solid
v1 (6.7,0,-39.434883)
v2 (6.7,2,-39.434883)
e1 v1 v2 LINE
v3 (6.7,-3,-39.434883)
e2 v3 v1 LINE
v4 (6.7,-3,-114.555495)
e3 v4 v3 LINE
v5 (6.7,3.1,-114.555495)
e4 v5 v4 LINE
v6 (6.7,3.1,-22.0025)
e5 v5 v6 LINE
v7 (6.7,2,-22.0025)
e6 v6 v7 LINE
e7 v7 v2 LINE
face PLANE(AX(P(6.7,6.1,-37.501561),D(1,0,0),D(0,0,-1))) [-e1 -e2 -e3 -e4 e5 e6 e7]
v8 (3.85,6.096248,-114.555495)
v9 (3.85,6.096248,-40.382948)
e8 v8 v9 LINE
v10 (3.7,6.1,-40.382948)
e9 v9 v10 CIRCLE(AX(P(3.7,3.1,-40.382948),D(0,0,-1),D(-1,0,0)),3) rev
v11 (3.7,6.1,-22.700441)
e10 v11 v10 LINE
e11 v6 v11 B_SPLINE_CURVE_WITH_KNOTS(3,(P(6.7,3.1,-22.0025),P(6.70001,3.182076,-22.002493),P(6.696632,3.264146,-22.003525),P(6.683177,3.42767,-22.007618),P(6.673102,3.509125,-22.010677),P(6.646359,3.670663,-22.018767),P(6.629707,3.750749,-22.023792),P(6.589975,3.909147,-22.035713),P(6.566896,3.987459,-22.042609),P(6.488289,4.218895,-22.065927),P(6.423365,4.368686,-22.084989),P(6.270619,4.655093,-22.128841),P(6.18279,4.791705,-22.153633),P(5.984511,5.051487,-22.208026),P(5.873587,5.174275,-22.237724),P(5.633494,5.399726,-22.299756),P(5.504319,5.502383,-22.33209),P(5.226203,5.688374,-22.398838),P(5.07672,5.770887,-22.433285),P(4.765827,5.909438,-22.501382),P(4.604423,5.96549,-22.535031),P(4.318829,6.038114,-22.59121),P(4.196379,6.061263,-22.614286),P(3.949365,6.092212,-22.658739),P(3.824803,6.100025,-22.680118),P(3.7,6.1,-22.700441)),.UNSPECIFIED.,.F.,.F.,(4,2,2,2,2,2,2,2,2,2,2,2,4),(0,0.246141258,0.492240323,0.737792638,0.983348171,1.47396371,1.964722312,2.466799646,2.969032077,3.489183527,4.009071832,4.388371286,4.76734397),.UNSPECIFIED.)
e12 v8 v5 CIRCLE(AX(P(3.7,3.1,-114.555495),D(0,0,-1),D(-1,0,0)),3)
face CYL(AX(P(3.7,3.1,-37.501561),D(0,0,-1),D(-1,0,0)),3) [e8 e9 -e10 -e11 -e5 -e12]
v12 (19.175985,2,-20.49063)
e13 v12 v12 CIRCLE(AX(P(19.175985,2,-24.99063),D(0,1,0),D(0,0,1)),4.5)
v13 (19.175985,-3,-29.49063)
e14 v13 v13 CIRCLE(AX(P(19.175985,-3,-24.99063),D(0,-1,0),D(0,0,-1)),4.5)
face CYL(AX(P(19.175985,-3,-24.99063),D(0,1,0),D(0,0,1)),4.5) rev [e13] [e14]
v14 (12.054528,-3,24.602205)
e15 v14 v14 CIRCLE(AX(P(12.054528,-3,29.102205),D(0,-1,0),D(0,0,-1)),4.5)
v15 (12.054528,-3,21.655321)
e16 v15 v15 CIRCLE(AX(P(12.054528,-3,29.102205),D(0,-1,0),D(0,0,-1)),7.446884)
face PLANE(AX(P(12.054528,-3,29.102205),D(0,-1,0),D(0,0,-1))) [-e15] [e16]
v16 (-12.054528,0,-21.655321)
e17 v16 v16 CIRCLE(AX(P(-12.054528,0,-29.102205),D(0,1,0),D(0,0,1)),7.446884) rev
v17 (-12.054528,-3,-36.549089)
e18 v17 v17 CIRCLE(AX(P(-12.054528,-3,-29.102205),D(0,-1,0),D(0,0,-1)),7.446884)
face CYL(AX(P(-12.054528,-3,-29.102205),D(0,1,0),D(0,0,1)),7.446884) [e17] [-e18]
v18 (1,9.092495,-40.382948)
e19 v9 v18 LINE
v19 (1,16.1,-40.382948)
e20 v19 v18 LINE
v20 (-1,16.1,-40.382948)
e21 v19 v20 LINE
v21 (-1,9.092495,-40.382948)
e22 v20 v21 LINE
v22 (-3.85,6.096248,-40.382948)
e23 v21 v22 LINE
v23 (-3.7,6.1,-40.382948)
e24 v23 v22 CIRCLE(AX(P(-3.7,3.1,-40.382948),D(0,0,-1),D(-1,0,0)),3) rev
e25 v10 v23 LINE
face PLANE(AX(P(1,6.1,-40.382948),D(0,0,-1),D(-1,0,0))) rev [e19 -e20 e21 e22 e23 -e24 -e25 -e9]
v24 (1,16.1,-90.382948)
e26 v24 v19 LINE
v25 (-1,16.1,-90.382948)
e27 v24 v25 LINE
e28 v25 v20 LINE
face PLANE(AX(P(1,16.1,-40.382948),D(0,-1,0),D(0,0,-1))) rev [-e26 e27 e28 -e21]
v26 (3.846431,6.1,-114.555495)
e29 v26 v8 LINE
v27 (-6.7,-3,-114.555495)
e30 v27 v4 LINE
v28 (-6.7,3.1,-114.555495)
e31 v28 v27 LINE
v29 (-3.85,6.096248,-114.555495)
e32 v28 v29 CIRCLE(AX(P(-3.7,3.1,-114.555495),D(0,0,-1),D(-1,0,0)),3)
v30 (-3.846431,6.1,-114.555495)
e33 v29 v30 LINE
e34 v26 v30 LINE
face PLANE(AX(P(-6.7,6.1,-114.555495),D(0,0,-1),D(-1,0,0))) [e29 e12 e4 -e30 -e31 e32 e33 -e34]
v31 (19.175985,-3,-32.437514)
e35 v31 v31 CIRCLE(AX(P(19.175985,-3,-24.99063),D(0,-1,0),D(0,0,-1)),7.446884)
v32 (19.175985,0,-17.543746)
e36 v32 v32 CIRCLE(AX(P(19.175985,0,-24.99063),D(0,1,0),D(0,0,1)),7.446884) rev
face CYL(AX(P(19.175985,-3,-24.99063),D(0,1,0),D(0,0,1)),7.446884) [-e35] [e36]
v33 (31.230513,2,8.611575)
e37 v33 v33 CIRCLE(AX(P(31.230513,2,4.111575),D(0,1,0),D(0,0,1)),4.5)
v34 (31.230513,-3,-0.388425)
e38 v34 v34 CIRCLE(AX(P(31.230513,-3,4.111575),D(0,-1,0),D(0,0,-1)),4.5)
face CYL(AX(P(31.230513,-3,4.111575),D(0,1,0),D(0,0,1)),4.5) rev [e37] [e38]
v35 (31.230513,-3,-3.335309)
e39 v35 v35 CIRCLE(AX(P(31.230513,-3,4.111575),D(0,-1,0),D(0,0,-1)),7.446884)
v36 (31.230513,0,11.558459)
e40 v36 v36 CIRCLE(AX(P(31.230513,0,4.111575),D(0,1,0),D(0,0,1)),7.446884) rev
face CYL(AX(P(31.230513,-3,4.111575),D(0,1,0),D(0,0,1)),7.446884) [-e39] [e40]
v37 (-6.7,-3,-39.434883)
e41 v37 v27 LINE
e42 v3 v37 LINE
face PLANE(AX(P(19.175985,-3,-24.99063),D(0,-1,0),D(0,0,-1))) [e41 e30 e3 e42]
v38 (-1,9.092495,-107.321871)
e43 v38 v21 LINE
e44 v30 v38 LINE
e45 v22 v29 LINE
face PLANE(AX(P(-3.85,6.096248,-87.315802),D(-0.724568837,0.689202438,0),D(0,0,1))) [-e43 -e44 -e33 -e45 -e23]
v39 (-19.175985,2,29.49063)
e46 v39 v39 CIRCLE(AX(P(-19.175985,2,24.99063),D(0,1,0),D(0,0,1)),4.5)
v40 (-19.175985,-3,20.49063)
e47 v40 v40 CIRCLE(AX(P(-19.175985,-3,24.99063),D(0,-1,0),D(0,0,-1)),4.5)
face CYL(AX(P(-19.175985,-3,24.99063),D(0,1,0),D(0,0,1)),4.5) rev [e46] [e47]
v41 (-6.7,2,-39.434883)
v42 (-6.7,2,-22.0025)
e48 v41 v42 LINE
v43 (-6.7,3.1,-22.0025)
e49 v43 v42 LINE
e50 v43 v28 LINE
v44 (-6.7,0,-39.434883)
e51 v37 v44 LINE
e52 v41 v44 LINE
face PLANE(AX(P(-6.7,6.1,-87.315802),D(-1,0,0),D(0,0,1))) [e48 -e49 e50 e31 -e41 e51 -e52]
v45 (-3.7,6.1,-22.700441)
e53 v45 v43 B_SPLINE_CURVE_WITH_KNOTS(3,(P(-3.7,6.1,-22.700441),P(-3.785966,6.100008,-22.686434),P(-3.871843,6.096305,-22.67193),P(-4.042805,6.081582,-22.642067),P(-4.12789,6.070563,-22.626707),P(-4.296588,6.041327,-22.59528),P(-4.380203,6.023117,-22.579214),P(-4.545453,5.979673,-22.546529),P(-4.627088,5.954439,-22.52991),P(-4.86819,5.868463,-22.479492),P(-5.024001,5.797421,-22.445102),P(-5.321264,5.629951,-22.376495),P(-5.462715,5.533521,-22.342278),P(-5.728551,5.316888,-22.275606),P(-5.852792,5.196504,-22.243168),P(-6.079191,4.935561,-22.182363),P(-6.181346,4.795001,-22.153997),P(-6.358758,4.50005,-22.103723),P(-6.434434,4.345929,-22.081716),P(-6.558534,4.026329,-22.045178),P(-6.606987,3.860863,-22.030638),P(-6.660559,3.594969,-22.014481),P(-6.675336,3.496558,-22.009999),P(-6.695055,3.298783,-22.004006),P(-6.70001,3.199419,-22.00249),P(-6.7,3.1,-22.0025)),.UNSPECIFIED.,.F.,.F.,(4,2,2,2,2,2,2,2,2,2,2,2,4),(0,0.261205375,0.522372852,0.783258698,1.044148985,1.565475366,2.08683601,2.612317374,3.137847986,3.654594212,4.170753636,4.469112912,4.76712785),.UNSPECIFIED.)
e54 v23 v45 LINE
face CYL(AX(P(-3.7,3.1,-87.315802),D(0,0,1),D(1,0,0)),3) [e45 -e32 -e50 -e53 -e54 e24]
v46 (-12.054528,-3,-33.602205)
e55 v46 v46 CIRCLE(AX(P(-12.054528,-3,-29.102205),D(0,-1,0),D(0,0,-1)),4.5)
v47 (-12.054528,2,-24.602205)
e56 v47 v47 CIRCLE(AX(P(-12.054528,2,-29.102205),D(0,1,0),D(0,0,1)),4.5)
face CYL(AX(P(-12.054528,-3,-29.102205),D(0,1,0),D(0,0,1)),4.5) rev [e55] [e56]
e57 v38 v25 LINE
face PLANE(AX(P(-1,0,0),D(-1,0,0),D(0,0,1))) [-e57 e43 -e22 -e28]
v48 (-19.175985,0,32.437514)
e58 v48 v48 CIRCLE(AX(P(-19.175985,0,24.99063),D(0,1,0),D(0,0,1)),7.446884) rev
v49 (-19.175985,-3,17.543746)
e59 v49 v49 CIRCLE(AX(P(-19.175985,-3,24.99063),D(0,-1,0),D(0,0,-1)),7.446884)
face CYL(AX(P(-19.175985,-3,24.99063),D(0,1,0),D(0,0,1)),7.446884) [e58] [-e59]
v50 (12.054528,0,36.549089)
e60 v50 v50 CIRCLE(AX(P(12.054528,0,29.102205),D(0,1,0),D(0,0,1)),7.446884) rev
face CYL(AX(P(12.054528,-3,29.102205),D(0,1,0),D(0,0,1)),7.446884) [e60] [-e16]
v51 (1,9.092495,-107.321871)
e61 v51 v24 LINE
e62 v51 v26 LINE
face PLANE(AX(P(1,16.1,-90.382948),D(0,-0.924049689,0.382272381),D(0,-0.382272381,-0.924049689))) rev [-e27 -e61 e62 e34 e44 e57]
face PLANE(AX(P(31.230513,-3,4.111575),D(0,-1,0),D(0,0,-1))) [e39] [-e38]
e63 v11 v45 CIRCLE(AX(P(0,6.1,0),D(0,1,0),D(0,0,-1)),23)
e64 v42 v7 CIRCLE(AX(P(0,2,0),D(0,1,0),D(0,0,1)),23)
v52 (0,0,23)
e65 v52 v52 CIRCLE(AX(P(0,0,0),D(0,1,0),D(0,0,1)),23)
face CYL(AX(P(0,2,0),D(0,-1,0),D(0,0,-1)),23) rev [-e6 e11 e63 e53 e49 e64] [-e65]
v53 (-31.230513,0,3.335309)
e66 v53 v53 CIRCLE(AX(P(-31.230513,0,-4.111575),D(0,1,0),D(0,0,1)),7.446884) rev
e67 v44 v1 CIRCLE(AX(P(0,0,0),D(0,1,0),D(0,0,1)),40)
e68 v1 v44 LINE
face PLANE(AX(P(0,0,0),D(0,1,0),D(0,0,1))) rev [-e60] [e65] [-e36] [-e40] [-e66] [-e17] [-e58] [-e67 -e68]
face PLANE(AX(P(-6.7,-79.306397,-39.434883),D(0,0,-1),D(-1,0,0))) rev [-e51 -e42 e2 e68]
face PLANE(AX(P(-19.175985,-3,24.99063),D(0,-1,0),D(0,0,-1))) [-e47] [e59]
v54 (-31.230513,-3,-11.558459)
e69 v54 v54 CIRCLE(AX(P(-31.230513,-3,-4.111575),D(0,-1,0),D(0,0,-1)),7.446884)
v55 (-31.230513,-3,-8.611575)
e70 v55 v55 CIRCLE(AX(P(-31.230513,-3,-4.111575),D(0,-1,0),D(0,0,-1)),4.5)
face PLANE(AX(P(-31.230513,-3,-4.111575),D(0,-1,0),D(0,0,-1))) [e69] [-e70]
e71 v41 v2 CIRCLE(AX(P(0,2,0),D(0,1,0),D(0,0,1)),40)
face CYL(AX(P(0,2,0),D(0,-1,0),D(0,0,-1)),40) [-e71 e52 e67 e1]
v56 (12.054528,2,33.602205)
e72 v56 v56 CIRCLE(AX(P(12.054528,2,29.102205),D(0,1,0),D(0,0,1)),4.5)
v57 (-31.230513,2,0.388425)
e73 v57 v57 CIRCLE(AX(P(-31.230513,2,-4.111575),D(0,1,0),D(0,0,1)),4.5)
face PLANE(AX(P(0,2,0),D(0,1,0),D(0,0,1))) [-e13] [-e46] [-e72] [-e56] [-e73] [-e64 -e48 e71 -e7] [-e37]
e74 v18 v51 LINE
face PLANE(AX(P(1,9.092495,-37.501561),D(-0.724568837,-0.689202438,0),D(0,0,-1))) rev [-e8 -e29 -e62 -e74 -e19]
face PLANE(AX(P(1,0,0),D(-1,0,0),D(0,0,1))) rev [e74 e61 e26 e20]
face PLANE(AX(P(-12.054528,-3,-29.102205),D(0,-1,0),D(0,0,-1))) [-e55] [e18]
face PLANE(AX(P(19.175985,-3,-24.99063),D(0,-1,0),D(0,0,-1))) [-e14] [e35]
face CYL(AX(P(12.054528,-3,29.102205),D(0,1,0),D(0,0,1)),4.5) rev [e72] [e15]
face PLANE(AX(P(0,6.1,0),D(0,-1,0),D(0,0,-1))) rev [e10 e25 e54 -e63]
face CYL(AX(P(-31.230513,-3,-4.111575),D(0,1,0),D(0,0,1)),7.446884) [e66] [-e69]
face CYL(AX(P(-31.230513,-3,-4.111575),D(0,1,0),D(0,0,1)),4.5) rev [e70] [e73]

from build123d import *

# Parameters (mm, degrees)
SKETCH1_R            = 40
SKETCH1_R_2          = 23
BOSS_EXTRUDE1_DEPTH  = 2
SKETCH2_R            = 7.446883929
SKETCH2_R_2          = 4.5
BOSS_EXTRUDE2_DEPTH  = 3
BOSS_EXTRUDE3_DEPTH  = 6.1
FILLET1_R            = 3
BOSS_EXTRUDE4_DEPTH  = 1
CHAMFER1_START       = -114.555494515
CHAMFER1_DEPTH       = 74.172546458
CHAMFER1_START_2     = 49.428104725
CHAMFER1_2_OUTLINE_W = 3
CHAMFER1_2_OUTLINE_H = 11
CHAMFER1_2_DEPTH     = 3.571895275
SKETCH6_R            = 4.5
CUT_EXTRUDE1_DEPTH   = 6
SKETCH7_W            = 13.4
SKETCH7_H            = 75.12061148
BOSS_EXTRUDE5_DEPTH  = 3


with BuildPart() as part:
    # Sketch1 → Boss-Extrude1 (new body)
    with BuildSketch(Plane(origin=(0, 0, 0), x_dir=(1, 0, 0), z_dir=(0, 1, 0))):
        with Locations(Location((0, 0, 0), (0, 0, 270))):
            Circle(SKETCH1_R)
        with Locations(Location((0, 0, 0), (0, 0, 270))):
            Circle(SKETCH1_R_2, mode=Mode.SUBTRACT)
    extrude(amount=BOSS_EXTRUDE1_DEPTH)

    # Sketch2 → Boss-Extrude2 (add)
    # profile 1 of 6: a face of its own
    with BuildSketch(Plane.XZ):
        with Locations(Location((12.054528119, 29.102205274, 0), (0, 0, 90))):
            Circle(SKETCH2_R)
        with Locations(Location((12.054528119, 29.102205274, 0), (0, 0, 270))):
            Circle(SKETCH2_R_2, mode=Mode.SUBTRACT)
    # profile 2 of 6: a face of its own
    with BuildSketch(Plane.XZ):
        with Locations(Location((-19.175985014, 24.990630219, 0), (0, 0, 90))):
            Circle(SKETCH2_R)
        with Locations(Location((-19.175985014, 24.990630219, 0), (0, 0, 270))):
            Circle(SKETCH2_R_2, mode=Mode.SUBTRACT)
    # profile 3 of 6: a face of its own
    with BuildSketch(Plane.XZ):
        with Locations(Location((31.230513133, 4.111575055, 0), (0, 0, 90))):
            Circle(SKETCH2_R)
        with Locations(Location((31.230513133, 4.111575055, 0), (0, 0, 270))):
            Circle(SKETCH2_R_2, mode=Mode.SUBTRACT)
    # profile 4 of 6: a face of its own
    with BuildSketch(Plane.XZ):
        with Locations(Location((19.175985014, -24.990630219, 0), (0, 0, 90))):
            Circle(SKETCH2_R)
        with Locations(Location((19.175985014, -24.990630219, 0), (0, 0, 270))):
            Circle(SKETCH2_R_2, mode=Mode.SUBTRACT)
    # profile 5 of 6: a face of its own
    with BuildSketch(Plane.XZ):
        with Locations(Location((-12.05452812, -29.102205274, 0), (0, 0, 90))):
            Circle(SKETCH2_R)
        with Locations(Location((-12.05452812, -29.102205274, 0), (0, 0, 270))):
            Circle(SKETCH2_R_2, mode=Mode.SUBTRACT)
    # profile 6 of 6: a face of its own
    with BuildSketch(Plane.XZ):
        with Locations(Location((-31.230513133, -4.111575055, 0), (0, 0, 90))):
            Circle(SKETCH2_R)
        with Locations(Location((-31.230513133, -4.111575055, 0), (0, 0, 270))):
            Circle(SKETCH2_R_2, mode=Mode.SUBTRACT)
    extrude(amount=BOSS_EXTRUDE2_DEPTH)

    # Sketch3 → Boss-Extrude3 (add)
    with BuildSketch(Plane.XZ):
        with BuildLine():
            Line((-6.7, -87.315801531), (-6.7, -114.555494515))
            Line((-6.7, -114.555494515), (6.7, -114.555494515))
            Line((6.7, -114.555494515), (6.7, -87.315801531))
            Line((6.7, -87.315801531), (6.7, -37.501560575))
            Line((6.7, -37.501560575), (6.7, -22.002499858))
            ThreePointArc((6.7, -22.002499858), (0, -23), (-6.7, -22.002499858))
            Line((-6.7, -22.002499858), (-6.7, -37.501560575))
            Line((-6.7, -37.501560575), (-6.7, -87.315801531))
        make_face()
    extrude(amount=-BOSS_EXTRUDE3_DEPTH)

    # Fillet1
    fillet1_edges = [part.edges().sort_by_distance(p)[0] for p in [
        (6.7, 6.1, -68.278997186),
        (-6.7, 6.1, -68.278997186),
    ]]
    fillet(fillet1_edges, radius=FILLET1_R)

    # Sketch5 → Boss-Extrude4 (add, symmetric)
    with BuildSketch(Plane(origin=(0, 0, 0), x_dir=(0, 0, -1), z_dir=(1, 0, 0))):
        Polygon((40.382948057, 6.1), (40.382948057, 16.1), (90.382948057, 16.1), (114.555494515, 6.1), align=None)
    extrude(amount=BOSS_EXTRUDE4_DEPTH, both=True)

    # Chamfer1: read off the stored shape, not the designer's step
    # Chamfer1 outline → Chamfer1 (add)
    with BuildSketch(Plane.XY.offset(CHAMFER1_START)):
        with BuildLine():
            Line((-1, 6.1), (-1, 9.092495307))
            Line((-1, 9.092495307), (-3.85, 6.096247653))
            ThreePointArc((-3.85, 6.096247653), (-3.775023463, 6.099061767), (-3.7, 6.1))
            Line((-3.7, 6.1), (-1, 6.1))
        make_face()
        with BuildLine():
            Line((1, 9.092495307), (1, 6.1))
            Line((1, 6.1), (3.7, 6.1))
            ThreePointArc((3.7, 6.1), (3.775023463, 6.099061767), (3.85, 6.096247653))
            Line((3.85, 6.096247653), (1, 9.092495307))
        make_face()
    extrude(amount=CHAMFER1_DEPTH)

    # Chamfer1 2 outline → Chamfer1 2 (cut)
    with BuildSketch(Plane(origin=(0, 0, 0), x_dir=(1, 0, 0), z_dir=(0, 0.924049688522023, -0.382272380825966)).offset(CHAMFER1_START_2)):
        with Locations((2.5, 99.5)):
            Rectangle(CHAMFER1_2_OUTLINE_W, CHAMFER1_2_OUTLINE_H)
        with Locations((-2.5, 99.5)):
            Rectangle(CHAMFER1_2_OUTLINE_W, CHAMFER1_2_OUTLINE_H)
    extrude(amount=CHAMFER1_2_DEPTH, mode=Mode.SUBTRACT)

    # Sketch6 → Cut-Extrude1 (cut, symmetric)
    with BuildSketch(Plane.XZ):
        with Locations(Location((19.175985014, -24.990630219, 0), (0, 0, 90))):
            Circle(SKETCH6_R)
        with Locations(Location((-12.05452812, -29.102205274, 0), (0, 0, 90))):
            Circle(SKETCH6_R)
        with Locations(Location((-31.230513133, -4.111575055, 0), (0, 0, 90))):
            Circle(SKETCH6_R)
        with Locations(Location((-19.175985014, 24.990630219, 0), (0, 0, 90))):
            Circle(SKETCH6_R)
        with Locations(Location((12.05452812, 29.102205274, 0), (0, 0, 90))):
            Circle(SKETCH6_R)
        with Locations(Location((31.230513133, 4.111575055, 0), (0, 0, 90))):
            Circle(SKETCH6_R)
    extrude(amount=CUT_EXTRUDE1_DEPTH, both=True, mode=Mode.SUBTRACT)

    # Sketch7 → Boss-Extrude5 (add)
    with BuildSketch(Plane.XZ):
        with Locations((0, -76.995188775)):
            Rectangle(SKETCH7_W, SKETCH7_H)
    extrude(amount=BOSS_EXTRUDE5_DEPTH)


solid = part.part
